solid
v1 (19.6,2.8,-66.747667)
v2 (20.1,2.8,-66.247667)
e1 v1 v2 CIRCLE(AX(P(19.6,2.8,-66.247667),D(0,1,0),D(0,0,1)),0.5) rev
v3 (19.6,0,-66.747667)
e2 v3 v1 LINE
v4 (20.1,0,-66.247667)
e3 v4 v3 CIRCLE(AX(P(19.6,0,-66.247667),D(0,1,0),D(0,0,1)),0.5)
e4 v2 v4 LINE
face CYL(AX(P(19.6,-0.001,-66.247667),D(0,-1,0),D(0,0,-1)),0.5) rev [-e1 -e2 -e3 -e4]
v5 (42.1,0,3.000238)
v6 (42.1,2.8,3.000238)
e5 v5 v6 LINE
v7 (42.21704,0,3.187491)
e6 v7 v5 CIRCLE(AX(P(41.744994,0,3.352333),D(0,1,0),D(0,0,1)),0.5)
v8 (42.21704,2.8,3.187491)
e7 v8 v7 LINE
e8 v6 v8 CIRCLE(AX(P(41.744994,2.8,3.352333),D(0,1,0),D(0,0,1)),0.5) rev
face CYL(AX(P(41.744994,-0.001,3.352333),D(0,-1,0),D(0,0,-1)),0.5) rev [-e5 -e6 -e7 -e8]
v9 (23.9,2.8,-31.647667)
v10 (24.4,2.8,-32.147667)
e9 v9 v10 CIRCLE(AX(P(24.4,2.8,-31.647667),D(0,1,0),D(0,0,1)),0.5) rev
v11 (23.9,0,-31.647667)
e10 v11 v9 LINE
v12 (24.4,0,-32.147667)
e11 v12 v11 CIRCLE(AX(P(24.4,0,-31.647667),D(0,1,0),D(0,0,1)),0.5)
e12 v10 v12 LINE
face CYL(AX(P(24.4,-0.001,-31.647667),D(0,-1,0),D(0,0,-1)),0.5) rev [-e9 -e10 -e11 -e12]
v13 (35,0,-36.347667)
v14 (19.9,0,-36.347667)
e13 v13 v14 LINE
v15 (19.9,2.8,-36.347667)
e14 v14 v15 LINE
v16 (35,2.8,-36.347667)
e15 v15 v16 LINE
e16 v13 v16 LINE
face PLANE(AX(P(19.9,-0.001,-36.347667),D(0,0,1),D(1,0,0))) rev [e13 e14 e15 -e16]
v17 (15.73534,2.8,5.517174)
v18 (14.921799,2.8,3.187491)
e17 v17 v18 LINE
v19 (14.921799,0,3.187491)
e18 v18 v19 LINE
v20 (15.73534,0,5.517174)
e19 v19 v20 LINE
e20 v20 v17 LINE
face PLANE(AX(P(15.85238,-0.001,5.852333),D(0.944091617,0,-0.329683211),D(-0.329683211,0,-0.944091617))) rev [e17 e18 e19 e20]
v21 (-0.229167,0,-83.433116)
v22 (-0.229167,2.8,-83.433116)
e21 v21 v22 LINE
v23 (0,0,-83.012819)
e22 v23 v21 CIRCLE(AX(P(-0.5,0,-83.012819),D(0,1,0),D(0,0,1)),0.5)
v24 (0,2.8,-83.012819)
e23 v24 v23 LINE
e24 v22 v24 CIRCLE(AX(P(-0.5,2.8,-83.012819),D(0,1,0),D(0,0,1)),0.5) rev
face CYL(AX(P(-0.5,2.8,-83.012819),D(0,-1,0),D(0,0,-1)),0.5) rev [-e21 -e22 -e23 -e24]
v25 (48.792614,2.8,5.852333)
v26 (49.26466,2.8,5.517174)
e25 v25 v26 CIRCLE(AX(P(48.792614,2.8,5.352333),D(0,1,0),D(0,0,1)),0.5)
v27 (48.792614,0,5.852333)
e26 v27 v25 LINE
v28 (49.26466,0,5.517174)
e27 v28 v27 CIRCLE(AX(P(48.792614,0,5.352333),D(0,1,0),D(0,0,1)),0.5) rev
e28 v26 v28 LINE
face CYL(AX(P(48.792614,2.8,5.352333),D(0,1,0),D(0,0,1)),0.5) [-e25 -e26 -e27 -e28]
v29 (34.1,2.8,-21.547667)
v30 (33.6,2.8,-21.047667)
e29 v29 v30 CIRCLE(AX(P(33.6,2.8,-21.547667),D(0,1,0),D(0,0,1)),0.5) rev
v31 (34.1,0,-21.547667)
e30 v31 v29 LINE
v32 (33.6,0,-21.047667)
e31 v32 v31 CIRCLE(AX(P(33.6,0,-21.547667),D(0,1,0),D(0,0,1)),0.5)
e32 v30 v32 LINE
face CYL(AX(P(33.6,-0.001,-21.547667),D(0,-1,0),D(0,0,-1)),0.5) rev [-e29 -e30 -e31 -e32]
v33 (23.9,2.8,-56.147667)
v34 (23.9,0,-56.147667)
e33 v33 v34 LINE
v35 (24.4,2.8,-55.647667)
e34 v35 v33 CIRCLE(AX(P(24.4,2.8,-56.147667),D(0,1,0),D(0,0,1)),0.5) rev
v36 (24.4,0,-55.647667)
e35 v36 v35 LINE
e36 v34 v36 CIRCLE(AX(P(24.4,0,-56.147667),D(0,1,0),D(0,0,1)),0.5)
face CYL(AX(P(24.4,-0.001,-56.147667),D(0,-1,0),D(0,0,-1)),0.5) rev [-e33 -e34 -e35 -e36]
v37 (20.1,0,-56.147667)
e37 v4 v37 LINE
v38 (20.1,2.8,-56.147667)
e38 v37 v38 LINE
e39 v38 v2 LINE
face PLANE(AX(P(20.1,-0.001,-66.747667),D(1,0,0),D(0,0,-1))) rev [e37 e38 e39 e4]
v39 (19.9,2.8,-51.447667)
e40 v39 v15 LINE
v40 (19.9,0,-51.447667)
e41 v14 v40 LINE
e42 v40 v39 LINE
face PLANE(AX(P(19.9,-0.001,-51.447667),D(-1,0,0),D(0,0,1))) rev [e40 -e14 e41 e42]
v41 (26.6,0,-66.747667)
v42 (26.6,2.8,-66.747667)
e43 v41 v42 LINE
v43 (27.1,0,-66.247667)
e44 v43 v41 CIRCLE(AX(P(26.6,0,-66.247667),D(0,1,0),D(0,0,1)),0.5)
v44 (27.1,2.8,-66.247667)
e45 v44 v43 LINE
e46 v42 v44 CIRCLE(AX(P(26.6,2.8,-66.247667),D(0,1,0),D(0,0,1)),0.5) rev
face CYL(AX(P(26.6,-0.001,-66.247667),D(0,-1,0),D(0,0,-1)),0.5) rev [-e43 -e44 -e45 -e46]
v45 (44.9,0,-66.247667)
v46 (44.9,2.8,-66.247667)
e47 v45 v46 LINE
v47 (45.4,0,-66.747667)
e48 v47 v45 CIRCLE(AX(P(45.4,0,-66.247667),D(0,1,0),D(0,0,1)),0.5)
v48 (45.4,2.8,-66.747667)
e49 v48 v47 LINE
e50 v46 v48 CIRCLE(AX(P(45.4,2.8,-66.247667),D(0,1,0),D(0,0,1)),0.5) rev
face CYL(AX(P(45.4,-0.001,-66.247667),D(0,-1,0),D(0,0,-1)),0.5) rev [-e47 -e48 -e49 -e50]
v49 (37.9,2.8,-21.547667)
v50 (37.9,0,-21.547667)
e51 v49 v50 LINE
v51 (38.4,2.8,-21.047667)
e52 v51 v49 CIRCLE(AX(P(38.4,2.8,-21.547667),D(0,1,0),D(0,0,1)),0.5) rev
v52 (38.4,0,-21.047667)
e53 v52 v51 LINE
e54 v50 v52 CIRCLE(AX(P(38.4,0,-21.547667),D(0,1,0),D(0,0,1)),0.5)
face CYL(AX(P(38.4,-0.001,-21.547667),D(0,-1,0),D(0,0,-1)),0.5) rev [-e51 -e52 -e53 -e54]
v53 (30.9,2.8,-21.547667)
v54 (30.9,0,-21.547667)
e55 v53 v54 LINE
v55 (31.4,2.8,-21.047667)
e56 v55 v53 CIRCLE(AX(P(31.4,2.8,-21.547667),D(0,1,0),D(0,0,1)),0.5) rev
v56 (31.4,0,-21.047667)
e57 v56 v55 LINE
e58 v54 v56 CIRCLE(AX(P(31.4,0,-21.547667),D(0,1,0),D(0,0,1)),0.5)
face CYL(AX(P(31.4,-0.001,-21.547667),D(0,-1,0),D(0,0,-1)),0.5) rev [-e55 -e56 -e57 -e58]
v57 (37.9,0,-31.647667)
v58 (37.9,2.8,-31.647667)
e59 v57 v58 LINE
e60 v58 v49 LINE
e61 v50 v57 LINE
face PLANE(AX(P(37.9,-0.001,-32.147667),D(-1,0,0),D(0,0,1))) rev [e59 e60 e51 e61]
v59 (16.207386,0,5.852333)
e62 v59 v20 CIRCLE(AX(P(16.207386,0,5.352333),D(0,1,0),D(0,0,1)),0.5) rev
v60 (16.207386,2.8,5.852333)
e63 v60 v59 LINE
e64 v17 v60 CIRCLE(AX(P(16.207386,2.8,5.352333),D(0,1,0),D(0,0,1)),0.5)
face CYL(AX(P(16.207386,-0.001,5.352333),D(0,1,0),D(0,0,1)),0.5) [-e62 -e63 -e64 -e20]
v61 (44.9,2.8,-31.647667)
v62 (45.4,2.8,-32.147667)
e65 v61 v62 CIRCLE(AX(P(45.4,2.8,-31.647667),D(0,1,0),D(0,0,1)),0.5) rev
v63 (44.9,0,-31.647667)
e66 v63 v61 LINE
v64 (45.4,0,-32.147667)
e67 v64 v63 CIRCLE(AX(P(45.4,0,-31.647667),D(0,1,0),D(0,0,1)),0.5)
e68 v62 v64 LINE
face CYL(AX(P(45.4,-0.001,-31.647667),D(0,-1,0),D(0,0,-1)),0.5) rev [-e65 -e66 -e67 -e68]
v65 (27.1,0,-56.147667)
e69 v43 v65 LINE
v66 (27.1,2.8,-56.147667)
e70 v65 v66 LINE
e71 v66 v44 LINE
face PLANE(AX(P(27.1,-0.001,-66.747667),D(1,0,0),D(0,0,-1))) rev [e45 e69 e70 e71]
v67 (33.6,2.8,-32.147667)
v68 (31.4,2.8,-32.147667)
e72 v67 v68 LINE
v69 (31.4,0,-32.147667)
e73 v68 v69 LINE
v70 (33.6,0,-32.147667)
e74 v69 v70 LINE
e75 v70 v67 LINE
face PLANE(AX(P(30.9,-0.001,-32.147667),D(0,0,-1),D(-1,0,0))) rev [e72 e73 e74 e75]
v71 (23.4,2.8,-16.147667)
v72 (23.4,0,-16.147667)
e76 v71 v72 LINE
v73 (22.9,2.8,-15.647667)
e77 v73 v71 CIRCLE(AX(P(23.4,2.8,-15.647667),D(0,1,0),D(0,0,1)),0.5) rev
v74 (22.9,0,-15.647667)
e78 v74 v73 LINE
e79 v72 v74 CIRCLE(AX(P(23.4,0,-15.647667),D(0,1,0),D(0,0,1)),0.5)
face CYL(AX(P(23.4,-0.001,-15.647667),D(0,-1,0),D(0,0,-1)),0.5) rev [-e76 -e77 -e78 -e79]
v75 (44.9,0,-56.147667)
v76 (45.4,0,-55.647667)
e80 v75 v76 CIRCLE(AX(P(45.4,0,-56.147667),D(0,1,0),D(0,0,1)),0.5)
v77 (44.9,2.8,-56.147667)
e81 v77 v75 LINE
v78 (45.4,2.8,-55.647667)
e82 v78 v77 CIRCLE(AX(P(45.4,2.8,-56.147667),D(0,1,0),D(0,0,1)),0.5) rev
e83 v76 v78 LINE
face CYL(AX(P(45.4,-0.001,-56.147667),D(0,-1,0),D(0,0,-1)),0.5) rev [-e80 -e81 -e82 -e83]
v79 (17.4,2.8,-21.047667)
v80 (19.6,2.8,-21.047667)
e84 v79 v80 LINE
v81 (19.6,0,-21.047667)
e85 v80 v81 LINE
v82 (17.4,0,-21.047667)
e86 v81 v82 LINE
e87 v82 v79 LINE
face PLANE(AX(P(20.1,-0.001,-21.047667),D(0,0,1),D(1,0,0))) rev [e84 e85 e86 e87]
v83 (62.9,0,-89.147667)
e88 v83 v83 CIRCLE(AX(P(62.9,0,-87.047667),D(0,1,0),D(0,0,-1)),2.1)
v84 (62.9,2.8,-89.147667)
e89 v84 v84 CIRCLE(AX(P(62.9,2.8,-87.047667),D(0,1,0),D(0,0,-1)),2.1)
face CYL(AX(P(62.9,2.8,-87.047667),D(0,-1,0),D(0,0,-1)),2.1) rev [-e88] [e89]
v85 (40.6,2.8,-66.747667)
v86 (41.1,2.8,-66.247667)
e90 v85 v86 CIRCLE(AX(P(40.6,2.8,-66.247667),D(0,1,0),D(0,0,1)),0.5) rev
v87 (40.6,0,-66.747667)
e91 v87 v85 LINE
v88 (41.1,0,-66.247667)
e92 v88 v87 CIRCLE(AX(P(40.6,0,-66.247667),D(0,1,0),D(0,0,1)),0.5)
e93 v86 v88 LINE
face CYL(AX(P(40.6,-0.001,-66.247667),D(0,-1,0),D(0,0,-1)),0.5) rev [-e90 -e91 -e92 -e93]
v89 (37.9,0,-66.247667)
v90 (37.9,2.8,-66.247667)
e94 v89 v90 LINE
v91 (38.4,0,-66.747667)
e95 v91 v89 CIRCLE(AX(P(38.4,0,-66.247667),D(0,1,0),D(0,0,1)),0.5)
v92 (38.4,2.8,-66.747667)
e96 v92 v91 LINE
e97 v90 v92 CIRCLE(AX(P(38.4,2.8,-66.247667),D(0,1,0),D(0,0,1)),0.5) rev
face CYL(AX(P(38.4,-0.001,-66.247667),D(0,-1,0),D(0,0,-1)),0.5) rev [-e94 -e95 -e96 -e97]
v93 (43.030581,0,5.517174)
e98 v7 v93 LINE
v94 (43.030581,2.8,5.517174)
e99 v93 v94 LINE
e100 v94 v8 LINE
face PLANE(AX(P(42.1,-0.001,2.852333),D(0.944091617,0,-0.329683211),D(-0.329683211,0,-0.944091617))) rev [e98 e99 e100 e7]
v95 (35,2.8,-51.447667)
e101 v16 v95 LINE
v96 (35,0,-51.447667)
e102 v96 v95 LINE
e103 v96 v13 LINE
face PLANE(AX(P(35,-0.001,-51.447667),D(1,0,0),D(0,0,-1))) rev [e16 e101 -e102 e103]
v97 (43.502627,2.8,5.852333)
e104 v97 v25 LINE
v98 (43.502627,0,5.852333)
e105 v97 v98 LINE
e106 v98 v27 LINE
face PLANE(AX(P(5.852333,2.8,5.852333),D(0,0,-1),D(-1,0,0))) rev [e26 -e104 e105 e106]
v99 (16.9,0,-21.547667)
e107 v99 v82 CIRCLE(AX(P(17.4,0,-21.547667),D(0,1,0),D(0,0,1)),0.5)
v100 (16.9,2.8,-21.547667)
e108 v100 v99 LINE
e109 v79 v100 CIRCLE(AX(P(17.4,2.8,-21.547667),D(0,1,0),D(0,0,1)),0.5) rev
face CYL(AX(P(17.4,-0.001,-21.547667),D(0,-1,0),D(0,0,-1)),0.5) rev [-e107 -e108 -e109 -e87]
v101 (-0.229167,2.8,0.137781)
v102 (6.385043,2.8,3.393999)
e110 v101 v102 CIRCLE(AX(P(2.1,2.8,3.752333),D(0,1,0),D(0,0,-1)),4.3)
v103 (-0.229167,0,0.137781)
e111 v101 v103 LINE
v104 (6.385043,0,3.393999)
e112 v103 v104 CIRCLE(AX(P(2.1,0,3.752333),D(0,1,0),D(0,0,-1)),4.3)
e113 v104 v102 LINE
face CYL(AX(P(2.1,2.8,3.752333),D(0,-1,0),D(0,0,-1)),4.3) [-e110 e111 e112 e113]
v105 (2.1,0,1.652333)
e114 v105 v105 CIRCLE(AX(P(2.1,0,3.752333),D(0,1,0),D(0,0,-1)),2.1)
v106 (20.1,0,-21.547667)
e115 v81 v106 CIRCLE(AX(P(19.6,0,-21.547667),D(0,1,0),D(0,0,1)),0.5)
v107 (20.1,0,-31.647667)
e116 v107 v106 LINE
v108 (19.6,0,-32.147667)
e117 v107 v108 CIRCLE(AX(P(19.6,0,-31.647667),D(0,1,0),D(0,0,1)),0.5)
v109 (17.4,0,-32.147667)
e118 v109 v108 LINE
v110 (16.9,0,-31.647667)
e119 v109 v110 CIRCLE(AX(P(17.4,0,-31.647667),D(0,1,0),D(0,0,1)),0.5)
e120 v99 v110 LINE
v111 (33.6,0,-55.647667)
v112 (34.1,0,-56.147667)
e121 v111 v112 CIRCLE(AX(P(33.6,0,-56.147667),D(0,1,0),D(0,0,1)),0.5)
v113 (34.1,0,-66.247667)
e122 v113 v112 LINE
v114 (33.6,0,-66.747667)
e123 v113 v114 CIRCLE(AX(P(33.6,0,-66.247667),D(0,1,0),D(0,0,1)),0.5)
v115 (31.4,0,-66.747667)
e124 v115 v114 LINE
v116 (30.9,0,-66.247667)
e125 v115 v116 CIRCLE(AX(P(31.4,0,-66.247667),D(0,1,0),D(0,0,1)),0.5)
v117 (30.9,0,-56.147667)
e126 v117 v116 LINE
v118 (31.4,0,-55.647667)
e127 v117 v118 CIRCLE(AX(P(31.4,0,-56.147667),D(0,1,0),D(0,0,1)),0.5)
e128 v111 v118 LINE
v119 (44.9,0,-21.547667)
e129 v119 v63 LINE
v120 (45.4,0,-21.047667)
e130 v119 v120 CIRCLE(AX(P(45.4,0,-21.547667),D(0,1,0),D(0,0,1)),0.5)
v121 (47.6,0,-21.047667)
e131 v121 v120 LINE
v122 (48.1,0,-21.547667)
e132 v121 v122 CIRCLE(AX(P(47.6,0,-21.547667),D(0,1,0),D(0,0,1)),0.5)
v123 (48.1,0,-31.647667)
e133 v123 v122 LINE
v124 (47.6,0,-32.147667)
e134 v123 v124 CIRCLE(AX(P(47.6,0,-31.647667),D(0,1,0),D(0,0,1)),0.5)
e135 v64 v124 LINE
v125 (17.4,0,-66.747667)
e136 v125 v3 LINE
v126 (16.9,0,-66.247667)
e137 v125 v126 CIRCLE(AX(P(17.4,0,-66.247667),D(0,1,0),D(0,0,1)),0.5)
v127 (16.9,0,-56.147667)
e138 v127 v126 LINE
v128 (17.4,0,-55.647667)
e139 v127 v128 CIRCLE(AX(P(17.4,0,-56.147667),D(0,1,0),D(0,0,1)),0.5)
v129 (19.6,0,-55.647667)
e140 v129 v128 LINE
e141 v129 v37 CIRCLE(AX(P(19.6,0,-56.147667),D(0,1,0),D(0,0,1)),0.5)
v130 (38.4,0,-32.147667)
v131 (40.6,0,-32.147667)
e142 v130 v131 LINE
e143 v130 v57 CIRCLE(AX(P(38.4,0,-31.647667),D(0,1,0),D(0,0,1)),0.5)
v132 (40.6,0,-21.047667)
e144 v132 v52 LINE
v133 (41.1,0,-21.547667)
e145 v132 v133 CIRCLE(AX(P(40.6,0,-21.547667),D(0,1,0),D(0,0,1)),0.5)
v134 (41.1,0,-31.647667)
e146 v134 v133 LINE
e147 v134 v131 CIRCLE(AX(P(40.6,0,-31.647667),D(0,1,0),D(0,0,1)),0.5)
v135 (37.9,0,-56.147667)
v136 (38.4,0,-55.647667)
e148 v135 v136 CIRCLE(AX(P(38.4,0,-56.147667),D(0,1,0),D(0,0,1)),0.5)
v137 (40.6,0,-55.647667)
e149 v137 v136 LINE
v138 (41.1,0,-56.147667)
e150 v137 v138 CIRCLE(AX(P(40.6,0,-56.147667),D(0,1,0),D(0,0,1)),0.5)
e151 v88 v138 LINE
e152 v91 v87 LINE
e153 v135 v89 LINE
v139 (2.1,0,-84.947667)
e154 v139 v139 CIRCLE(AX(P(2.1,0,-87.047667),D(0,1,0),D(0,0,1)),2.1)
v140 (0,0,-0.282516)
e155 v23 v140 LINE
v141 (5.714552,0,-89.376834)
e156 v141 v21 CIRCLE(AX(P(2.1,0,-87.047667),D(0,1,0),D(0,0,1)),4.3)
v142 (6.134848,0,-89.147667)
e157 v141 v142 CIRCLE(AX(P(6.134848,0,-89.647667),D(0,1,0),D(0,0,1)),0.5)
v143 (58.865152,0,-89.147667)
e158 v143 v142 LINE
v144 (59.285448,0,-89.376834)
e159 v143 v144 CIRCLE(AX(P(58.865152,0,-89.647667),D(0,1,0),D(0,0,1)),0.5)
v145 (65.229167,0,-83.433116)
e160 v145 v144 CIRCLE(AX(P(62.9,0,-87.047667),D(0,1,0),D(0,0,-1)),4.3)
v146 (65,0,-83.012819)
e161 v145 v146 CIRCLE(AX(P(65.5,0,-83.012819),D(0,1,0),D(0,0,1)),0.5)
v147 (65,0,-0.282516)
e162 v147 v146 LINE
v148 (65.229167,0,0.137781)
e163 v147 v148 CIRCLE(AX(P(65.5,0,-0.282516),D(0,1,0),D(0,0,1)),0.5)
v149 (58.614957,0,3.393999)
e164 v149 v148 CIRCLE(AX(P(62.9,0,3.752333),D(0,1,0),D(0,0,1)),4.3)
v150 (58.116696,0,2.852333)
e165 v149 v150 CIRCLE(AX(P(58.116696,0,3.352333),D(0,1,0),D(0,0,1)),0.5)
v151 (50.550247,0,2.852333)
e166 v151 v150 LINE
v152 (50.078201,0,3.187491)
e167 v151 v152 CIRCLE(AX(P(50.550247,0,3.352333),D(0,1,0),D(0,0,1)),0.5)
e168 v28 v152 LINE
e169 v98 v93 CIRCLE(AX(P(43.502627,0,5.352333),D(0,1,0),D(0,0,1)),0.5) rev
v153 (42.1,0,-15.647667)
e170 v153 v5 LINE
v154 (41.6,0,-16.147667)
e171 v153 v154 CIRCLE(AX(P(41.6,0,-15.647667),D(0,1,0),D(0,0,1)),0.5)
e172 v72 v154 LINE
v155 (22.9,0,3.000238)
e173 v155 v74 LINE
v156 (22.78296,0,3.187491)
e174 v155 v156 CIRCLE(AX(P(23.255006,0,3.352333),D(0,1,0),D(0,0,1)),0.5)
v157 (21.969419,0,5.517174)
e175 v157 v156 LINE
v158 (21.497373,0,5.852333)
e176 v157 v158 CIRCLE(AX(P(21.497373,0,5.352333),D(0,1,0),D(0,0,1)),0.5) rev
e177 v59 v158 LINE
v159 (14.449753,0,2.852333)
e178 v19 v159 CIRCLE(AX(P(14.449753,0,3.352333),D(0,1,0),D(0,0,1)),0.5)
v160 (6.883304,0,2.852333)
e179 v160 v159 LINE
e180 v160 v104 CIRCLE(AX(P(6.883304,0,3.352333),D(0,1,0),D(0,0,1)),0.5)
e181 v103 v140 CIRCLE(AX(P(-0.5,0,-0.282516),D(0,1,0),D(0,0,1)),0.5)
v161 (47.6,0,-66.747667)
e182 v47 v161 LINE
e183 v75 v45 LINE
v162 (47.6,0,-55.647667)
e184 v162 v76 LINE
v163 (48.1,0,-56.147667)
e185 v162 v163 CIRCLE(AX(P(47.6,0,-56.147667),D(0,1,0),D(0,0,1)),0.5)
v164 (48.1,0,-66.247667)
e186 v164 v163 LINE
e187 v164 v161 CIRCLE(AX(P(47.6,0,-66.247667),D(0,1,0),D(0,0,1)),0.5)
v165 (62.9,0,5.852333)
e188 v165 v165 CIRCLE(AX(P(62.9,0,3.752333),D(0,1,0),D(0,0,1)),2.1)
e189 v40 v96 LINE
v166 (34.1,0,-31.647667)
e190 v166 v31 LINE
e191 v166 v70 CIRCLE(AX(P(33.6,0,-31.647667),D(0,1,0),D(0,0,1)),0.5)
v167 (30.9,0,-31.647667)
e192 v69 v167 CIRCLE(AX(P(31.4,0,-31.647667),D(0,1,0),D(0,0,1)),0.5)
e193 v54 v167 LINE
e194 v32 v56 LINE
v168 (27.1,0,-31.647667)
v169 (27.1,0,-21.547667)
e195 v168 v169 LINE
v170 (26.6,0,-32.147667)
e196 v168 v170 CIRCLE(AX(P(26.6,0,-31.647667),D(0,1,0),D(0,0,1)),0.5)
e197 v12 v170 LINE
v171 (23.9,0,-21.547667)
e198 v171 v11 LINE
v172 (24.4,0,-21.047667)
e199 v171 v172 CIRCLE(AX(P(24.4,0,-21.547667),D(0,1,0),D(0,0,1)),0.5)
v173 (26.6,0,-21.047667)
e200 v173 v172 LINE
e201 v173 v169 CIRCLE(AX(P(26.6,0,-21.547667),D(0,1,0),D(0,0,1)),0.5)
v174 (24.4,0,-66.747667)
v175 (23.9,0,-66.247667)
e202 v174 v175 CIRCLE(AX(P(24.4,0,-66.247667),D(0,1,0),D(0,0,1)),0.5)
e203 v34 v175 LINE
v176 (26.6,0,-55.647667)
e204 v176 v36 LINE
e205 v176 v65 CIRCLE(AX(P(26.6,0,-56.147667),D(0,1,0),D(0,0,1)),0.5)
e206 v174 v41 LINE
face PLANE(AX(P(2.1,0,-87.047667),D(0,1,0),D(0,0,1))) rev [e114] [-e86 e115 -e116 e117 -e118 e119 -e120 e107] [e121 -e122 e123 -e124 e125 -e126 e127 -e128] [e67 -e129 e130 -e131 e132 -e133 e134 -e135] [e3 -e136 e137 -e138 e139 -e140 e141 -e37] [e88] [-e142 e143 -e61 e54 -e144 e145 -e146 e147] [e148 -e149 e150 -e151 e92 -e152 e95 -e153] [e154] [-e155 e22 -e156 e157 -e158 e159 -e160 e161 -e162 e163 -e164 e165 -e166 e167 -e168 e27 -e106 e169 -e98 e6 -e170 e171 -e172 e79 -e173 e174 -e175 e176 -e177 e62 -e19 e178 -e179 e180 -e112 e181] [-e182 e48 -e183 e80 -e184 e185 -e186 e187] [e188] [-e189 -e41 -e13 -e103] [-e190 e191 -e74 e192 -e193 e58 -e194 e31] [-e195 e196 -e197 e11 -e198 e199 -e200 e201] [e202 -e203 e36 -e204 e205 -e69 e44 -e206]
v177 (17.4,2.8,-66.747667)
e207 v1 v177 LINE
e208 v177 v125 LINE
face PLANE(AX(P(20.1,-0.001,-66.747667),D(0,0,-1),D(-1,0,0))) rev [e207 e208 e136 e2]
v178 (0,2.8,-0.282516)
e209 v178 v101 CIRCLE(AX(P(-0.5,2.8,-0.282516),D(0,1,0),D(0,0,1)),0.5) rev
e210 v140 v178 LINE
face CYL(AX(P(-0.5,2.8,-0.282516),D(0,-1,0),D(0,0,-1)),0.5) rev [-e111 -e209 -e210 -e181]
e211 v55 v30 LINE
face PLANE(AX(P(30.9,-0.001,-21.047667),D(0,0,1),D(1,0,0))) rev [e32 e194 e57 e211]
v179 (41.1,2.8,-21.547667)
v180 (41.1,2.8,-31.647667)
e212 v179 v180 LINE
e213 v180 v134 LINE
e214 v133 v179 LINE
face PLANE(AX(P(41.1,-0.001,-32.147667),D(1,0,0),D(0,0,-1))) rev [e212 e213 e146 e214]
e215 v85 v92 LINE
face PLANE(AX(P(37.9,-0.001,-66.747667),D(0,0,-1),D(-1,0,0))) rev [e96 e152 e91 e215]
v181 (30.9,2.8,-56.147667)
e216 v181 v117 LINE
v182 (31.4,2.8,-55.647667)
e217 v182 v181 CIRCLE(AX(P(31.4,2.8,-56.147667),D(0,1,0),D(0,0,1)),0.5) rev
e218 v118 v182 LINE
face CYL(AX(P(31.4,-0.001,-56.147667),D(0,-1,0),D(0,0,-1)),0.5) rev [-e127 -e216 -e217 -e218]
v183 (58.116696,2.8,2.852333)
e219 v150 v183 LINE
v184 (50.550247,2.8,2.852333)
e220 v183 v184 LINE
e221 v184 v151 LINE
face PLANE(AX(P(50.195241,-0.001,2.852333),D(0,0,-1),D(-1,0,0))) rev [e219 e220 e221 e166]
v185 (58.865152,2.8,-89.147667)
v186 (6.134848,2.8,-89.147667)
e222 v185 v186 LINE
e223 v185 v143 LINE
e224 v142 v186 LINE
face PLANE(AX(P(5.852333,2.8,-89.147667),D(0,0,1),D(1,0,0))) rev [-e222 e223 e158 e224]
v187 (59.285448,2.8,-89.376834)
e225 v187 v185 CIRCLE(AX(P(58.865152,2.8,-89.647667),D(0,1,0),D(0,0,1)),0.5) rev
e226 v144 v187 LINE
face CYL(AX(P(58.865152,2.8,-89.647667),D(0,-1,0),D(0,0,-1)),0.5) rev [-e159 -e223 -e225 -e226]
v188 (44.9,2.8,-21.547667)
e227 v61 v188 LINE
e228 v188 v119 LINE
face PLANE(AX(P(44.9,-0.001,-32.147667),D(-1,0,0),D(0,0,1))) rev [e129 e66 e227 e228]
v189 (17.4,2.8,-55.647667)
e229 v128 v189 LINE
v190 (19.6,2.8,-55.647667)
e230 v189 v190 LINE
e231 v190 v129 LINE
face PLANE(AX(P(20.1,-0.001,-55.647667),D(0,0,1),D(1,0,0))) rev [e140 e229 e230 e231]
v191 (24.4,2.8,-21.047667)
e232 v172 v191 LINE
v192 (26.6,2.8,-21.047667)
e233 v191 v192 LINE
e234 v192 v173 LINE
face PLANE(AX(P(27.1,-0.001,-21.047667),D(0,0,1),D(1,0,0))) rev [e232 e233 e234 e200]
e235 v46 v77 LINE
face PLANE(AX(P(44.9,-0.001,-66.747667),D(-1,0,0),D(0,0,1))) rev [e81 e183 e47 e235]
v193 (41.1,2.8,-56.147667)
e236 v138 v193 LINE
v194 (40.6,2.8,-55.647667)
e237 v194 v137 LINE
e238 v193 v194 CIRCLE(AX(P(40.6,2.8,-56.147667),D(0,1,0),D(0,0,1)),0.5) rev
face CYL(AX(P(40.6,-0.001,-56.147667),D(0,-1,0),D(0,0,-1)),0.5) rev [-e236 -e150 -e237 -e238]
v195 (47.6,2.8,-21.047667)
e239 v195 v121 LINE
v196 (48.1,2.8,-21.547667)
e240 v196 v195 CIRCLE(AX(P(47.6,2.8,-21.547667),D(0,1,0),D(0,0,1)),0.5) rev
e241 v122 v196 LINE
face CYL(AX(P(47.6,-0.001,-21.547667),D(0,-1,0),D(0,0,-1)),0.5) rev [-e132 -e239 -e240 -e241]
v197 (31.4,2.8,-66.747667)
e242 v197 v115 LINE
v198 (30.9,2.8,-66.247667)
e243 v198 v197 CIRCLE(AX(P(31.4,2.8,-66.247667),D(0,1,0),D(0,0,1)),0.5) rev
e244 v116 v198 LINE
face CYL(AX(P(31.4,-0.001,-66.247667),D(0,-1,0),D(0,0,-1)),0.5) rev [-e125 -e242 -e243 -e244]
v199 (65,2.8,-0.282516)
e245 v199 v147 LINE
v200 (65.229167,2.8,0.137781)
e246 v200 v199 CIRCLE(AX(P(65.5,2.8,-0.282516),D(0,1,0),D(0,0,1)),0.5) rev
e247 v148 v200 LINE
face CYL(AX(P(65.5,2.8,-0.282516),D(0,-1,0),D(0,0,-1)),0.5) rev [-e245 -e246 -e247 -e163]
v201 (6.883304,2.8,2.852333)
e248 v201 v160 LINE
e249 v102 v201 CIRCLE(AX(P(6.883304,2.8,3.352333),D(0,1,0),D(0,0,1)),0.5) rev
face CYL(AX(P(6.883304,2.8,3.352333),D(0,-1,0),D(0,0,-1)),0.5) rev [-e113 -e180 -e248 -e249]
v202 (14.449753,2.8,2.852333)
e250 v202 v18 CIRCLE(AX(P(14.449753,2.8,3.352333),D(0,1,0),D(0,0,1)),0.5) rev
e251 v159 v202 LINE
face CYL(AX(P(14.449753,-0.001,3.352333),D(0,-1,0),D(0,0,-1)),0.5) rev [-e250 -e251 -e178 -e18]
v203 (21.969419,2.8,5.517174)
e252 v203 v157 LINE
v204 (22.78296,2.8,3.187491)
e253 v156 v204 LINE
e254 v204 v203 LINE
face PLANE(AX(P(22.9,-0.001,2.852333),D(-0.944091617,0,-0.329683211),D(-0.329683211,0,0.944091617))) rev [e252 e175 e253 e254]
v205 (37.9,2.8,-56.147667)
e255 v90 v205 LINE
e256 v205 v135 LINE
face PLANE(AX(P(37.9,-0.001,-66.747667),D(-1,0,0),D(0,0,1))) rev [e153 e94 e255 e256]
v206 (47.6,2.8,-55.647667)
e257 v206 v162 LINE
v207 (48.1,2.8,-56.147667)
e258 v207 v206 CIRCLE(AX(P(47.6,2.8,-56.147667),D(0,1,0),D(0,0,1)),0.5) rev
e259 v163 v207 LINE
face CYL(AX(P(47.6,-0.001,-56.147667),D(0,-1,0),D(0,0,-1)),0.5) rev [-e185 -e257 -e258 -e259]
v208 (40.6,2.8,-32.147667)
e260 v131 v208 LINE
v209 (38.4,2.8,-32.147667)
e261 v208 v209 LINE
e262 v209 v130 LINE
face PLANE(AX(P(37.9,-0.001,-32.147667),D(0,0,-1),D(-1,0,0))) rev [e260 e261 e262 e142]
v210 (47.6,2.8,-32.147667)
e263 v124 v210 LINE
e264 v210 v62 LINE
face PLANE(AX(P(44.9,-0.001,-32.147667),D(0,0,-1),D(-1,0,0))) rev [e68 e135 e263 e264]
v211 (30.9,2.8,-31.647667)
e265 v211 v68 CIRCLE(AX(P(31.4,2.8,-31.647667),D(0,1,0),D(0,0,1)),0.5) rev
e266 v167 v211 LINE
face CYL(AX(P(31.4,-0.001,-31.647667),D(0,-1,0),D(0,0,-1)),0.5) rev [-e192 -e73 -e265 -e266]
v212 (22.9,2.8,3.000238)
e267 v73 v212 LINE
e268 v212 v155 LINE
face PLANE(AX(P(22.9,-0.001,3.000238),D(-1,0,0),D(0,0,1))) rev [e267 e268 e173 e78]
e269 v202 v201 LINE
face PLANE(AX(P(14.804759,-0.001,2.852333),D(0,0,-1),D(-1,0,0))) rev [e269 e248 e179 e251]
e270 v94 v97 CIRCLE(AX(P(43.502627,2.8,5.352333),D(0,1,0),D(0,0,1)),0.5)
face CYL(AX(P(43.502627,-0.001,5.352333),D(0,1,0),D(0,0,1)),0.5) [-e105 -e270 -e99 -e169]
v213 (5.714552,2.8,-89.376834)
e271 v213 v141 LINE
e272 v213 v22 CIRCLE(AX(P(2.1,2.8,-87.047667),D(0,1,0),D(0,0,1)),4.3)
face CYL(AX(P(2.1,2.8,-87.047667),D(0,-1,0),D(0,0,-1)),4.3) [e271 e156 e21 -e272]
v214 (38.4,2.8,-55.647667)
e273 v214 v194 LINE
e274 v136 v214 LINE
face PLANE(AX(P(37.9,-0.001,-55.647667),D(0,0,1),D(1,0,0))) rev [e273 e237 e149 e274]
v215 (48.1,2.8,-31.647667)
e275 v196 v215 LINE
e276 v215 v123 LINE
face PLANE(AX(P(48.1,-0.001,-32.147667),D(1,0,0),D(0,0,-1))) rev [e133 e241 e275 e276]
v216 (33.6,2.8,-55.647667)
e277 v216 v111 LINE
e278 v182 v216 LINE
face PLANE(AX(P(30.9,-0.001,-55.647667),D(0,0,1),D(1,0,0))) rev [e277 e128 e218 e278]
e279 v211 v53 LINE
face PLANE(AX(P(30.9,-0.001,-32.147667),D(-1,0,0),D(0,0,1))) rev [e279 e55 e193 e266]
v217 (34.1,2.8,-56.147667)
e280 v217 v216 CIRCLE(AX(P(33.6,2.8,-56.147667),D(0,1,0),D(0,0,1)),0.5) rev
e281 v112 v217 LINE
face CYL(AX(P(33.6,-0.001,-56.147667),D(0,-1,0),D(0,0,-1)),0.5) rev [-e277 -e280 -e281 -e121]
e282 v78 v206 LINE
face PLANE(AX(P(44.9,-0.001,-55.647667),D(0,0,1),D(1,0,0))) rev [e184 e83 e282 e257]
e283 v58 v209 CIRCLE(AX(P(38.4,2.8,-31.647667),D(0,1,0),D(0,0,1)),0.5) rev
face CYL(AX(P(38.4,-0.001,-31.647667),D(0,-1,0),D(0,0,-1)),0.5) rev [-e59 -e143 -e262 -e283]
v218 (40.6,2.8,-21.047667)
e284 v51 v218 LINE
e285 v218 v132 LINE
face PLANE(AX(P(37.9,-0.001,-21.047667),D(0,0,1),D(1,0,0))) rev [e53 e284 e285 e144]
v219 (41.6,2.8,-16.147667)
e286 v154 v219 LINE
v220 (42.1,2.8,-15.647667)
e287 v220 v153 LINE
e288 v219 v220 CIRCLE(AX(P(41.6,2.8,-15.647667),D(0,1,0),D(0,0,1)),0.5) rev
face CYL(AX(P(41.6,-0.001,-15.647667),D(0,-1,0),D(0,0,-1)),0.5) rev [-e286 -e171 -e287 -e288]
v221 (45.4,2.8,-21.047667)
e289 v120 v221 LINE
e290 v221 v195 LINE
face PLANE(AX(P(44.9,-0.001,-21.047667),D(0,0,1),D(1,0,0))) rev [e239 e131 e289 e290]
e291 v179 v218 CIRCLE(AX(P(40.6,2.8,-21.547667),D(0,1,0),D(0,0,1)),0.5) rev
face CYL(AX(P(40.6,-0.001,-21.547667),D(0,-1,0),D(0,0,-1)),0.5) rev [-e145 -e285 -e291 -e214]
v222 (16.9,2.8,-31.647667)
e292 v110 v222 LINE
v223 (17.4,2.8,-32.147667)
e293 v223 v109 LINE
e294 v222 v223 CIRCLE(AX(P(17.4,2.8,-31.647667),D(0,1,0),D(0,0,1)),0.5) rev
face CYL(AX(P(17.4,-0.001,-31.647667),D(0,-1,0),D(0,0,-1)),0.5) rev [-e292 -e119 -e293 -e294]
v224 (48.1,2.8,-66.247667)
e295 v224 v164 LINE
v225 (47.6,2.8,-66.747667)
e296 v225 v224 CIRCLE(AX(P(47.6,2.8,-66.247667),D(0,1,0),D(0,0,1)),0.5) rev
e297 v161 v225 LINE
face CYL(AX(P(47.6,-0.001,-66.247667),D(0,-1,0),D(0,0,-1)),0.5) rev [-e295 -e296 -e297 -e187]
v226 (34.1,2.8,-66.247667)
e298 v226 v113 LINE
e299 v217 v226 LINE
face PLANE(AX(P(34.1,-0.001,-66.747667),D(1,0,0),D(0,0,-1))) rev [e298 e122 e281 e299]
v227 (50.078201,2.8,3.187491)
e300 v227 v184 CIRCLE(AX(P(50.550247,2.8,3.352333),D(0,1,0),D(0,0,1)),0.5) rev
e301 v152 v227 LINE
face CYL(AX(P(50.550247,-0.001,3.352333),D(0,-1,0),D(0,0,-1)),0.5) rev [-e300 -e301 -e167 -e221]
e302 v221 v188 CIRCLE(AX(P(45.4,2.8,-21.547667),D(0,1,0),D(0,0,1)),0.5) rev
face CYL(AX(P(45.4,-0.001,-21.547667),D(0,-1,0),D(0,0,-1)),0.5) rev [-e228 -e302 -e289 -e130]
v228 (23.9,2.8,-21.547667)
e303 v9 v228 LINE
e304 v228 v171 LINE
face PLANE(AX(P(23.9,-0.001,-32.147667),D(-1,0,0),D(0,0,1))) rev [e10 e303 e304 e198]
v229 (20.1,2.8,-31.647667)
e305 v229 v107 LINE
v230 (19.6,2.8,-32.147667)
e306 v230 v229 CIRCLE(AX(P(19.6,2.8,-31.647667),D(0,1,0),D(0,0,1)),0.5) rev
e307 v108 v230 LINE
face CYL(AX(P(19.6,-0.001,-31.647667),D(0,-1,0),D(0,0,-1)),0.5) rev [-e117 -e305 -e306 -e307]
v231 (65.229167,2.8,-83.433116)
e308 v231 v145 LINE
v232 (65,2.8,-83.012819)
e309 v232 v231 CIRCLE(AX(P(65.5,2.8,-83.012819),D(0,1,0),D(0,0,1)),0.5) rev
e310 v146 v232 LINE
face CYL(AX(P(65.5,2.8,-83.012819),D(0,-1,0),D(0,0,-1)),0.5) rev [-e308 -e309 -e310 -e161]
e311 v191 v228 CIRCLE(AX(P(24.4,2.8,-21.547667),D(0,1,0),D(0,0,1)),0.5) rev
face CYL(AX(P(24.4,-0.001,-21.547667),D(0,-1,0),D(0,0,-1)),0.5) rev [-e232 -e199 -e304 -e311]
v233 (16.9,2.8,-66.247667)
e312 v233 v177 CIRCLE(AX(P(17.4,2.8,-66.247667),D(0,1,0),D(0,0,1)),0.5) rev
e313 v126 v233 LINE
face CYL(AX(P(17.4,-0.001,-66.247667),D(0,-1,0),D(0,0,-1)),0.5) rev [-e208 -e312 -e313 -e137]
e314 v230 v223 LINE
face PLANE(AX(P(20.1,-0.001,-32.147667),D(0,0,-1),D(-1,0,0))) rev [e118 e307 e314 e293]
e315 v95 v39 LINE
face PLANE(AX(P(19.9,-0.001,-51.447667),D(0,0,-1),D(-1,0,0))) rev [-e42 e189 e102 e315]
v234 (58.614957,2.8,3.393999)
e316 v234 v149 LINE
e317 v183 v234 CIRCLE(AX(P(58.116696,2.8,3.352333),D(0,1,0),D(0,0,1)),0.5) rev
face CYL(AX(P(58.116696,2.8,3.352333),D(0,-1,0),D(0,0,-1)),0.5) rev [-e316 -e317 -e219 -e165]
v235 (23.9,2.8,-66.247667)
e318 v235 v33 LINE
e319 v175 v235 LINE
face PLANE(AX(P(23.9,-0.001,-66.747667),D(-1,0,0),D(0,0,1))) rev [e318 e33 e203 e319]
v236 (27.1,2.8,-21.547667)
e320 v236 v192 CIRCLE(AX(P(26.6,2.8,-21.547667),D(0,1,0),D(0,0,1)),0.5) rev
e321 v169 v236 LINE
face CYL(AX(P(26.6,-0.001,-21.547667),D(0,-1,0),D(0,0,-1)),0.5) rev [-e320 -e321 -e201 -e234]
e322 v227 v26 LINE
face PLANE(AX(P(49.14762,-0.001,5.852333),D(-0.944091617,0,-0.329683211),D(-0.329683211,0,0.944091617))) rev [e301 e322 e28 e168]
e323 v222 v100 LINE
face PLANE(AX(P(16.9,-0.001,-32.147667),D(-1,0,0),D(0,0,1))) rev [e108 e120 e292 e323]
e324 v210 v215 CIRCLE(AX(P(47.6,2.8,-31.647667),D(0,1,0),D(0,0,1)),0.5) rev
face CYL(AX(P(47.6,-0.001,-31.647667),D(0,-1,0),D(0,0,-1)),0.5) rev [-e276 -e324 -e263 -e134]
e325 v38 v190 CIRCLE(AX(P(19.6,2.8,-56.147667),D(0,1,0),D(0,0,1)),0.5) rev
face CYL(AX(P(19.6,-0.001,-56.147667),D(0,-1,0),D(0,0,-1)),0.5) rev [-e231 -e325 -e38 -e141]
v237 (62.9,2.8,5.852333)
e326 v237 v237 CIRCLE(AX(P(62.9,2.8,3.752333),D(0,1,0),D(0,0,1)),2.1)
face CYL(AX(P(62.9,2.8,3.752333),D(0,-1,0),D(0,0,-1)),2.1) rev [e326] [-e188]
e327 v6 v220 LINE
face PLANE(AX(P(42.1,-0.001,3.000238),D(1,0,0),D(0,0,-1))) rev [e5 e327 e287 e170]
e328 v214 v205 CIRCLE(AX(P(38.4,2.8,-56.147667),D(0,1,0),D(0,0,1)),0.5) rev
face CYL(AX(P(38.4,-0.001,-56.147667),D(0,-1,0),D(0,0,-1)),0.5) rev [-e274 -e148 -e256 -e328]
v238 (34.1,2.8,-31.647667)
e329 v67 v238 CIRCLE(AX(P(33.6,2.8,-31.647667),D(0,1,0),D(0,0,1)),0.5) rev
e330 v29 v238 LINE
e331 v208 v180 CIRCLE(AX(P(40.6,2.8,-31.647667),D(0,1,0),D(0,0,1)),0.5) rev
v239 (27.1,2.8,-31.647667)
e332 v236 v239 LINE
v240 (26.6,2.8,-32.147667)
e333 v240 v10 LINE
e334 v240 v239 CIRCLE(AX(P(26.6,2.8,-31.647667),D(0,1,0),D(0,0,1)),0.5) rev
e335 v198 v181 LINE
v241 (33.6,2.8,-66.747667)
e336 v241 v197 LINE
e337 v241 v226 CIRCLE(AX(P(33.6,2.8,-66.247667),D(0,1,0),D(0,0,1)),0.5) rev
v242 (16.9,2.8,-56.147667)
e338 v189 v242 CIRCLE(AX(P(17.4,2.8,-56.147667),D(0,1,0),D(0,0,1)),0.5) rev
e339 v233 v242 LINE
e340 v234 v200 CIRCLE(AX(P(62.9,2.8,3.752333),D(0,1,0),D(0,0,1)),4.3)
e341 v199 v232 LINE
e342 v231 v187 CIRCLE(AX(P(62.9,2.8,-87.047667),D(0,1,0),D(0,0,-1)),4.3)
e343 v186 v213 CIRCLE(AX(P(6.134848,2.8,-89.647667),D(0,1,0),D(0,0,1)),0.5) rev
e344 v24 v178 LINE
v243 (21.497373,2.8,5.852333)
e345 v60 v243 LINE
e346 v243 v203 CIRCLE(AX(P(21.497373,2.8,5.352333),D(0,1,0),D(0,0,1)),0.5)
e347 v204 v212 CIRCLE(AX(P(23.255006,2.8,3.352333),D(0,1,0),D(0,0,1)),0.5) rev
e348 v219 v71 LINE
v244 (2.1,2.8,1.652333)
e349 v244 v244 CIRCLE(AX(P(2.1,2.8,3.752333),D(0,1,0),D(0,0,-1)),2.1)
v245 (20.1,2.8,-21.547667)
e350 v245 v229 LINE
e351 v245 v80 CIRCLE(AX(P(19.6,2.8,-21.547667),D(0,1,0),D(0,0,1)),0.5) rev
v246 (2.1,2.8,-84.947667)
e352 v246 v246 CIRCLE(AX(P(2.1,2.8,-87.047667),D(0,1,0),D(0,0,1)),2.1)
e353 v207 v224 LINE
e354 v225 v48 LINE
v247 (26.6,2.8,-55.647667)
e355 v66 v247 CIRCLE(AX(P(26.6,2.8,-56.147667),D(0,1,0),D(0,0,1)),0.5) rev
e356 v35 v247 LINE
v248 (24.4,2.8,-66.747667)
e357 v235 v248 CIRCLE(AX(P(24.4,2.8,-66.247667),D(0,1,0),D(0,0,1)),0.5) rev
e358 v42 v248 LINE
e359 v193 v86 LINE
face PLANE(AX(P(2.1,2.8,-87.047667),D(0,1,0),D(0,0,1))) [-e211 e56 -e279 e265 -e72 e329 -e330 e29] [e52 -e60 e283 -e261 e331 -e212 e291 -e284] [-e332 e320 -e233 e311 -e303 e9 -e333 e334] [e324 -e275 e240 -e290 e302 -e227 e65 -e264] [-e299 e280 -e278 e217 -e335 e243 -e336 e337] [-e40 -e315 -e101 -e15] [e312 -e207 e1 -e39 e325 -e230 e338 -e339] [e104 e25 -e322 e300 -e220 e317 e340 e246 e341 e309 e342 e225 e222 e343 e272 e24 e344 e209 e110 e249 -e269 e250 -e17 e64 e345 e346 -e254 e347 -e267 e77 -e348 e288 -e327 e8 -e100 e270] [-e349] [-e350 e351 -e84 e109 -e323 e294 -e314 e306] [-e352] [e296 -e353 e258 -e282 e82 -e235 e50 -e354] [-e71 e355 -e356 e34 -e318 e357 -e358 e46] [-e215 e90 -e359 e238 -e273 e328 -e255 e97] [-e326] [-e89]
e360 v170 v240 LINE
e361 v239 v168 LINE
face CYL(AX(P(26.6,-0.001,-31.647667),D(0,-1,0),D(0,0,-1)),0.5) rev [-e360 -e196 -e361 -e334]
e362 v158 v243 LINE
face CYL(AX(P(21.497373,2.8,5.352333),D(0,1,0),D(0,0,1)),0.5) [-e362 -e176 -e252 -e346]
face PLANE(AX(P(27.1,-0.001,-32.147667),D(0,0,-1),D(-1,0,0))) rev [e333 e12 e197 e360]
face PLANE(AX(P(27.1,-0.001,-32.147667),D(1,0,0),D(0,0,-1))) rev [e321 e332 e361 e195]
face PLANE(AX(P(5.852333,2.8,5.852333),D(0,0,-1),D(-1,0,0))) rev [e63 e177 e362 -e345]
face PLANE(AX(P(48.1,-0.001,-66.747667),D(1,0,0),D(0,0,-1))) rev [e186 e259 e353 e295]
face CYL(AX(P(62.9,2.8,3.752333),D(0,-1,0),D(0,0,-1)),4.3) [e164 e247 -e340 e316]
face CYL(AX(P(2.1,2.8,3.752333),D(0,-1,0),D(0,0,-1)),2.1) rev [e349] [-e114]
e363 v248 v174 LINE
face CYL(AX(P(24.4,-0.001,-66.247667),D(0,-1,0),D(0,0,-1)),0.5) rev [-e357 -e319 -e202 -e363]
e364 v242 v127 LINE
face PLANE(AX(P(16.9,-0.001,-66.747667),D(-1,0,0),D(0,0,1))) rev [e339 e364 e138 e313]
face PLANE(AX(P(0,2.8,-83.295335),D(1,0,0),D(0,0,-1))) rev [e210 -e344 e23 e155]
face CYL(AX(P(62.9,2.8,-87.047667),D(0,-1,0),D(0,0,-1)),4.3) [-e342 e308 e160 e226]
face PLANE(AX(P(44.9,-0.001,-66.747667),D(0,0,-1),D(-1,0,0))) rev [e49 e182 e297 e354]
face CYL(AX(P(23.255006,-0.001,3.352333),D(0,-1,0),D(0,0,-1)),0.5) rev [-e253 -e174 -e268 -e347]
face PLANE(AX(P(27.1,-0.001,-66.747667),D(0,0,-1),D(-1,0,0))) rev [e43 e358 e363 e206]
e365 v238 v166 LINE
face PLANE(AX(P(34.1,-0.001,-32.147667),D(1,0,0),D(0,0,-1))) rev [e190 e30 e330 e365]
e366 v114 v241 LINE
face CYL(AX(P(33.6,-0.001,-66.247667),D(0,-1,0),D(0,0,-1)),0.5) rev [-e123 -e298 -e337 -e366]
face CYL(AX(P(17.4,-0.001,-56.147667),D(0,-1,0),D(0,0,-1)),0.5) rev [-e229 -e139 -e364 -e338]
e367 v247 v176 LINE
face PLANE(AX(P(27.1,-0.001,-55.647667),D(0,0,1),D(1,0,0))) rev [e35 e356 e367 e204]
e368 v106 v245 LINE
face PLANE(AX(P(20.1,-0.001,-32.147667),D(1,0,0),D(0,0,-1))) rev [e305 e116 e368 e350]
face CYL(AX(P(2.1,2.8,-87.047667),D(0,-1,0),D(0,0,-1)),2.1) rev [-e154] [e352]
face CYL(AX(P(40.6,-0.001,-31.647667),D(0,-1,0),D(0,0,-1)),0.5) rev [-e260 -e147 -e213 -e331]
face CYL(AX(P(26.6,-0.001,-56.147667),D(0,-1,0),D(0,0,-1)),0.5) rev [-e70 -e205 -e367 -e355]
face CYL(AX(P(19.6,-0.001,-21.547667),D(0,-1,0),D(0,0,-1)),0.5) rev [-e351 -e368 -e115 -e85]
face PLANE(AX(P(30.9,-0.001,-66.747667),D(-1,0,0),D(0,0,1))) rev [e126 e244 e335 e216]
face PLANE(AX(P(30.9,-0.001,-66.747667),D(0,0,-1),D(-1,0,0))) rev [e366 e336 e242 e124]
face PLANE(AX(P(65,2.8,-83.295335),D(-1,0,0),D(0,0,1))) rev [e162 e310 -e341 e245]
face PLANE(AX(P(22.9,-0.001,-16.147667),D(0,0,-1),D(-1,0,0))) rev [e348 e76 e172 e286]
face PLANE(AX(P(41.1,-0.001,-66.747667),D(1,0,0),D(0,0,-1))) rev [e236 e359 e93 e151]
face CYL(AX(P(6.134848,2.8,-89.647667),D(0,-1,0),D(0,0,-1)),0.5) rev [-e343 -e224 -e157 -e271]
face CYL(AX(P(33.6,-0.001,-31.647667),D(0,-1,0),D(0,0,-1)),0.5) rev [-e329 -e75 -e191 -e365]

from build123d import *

# Parameters (mm, degrees)
BASEPLATE_OUTLINE_R = 2.1
BASEPLATE_DEPTH     = 2.8
CUT_EXTRUDE1_REACH  = 115.438
SKETCH3_W           = 19.2
SKETCH3_H           = 19.147905432
SKETCH3_W_2         = 15.1
SKETCH3_H_2         = 15.1
SKETCH3_W_3         = 3.2
SKETCH3_H_3         = 11.1
FILLET1_R           = 0.5


# Read off the part's stored shape, not the designer's step: BasePlate
with BuildPart() as part:
    # BasePlate outline → BasePlate (new body)
    with BuildSketch(Plane(origin=(0, 0, 0), x_dir=(1, 0, 0), z_dir=(0, 1, 0))):
        with BuildLine():
            Line((43.502626614, -5.852332608), (48.792614178, -5.852332608))
            ThreePointArc((48.792614178, -5.852332608), (49.082078508, -5.760021707), (49.264659986, -5.517174213))
            Line((49.264659986, -5.517174213), (50.078201202, -3.187491002))
            ThreePointArc((50.078201202, -3.187491002), (50.26078268, -2.944643509), (50.55024701, -2.852332608))
            Line((50.55024701, -2.852332608), (58.116695703, -2.852332608))
            ThreePointArc((58.116695703, -2.852332608), (58.484685739, -3.013831008), (58.614956567, -3.393999275))
            ThreePointArc((58.614956567, -3.393999275), (64.799237397, -7.61016844), (65.229166667, -0.137781095))
            ThreePointArc((65.229166667, -0.137781095), (65.061014427, 0.043158816), (65, 0.282515593))
            Line((65, 0.282515593), (65, 83.012819192))
            ThreePointArc((65, 83.012819192), (65.061014427, 83.252175969), (65.229166667, 83.433115879))
            ThreePointArc((65.229166667, 83.433115879), (65.940559159, 90.088226551), (59.285448487, 89.376834059))
            ThreePointArc((59.285448487, 89.376834059), (59.104508577, 89.208681819), (58.8651518, 89.147667392))
            Line((58.8651518, 89.147667392), (6.1348482, 89.147667392))
            ThreePointArc((6.1348482, 89.147667392), (5.895491423, 89.208681819), (5.714551513, 89.376834059))
            ThreePointArc((5.714551513, 89.376834059), (-0.940559159, 90.088226551), (-0.229166667, 83.433115879))
            ThreePointArc((-0.229166667, 83.433115879), (-0.061014427, 83.252175969), (0, 83.012819192))
            Line((0, 83.012819192), (0, 0.282515593))
            ThreePointArc((0, 0.282515593), (-0.061014427, 0.043158816), (-0.229166667, -0.137781095))
            ThreePointArc((-0.229166667, -0.137781095), (0.200762603, -7.61016844), (6.385043433, -3.393999275))
            ThreePointArc((6.385043433, -3.393999275), (6.515314261, -3.013831008), (6.883304297, -2.852332608))
            Line((6.883304297, -2.852332608), (14.44975299, -2.852332608))
            ThreePointArc((14.44975299, -2.852332608), (14.73921732, -2.944643509), (14.921798798, -3.187491002))
            Line((14.921798798, -3.187491002), (15.735340014, -5.517174213))
            ThreePointArc((15.735340014, -5.517174213), (15.917921492, -5.760021707), (16.207385822, -5.852332608))
            Line((16.207385822, -5.852332608), (21.497373386, -5.852332608))
            ThreePointArc((21.497373386, -5.852332608), (21.786837716, -5.760021707), (21.969419194, -5.517174213))
            Line((21.969419194, -5.517174213), (22.78296041, -3.187491002))
            ThreePointArc((22.78296041, -3.187491002), (22.965541888, -2.944643509), (23.255006218, -2.852332608))
            Line((23.255006218, -2.852332608), (41.744993782, -2.852332608))
            ThreePointArc((41.744993782, -2.852332608), (42.034458112, -2.944643509), (42.21703959, -3.187491002))
            Line((42.21703959, -3.187491002), (43.030580806, -5.517174213))
            ThreePointArc((43.030580806, -5.517174213), (43.213162284, -5.760021707), (43.502626614, -5.852332608))
        make_face()
        with Locations((2.1, -3.752332608)):
            Circle(BASEPLATE_OUTLINE_R, mode=Mode.SUBTRACT)
        with Locations((62.9, -3.752332608)):
            Circle(BASEPLATE_OUTLINE_R, mode=Mode.SUBTRACT)
        with Locations((2.1, 87.047667392)):
            Circle(BASEPLATE_OUTLINE_R, mode=Mode.SUBTRACT)
        with Locations((62.9, 87.047667392)):
            Circle(BASEPLATE_OUTLINE_R, mode=Mode.SUBTRACT)
    extrude(amount=BASEPLATE_DEPTH)

    # Sketch3 → Cut-Extrude1 (cut, up to next)
    with BuildSketch(Plane(origin=(0, 2.8, 0), x_dir=(1, 0, 0), z_dir=(0, 1, 0)), mode=Mode.PRIVATE) as cut_extrude1_sk1:
        with Locations((32.5, 6.573714676)):
            Rectangle(SKETCH3_W, SKETCH3_H)
    cut_extrude1_tool1 = extrude(cut_extrude1_sk1.sketch, amount=-CUT_EXTRUDE1_REACH, mode=Mode.PRIVATE) & part.part
    # Sketch3 → Cut-Extrude1 (cut, up to next)
    with BuildSketch(Plane(origin=(0, 2.8, 0), x_dir=(1, 0, 0), z_dir=(0, 1, 0)), mode=Mode.PRIVATE) as cut_extrude1_sk2:
        with Locations((27.45, 43.897667392)):
            Rectangle(SKETCH3_W_2, SKETCH3_H_2)
    cut_extrude1_tool2 = extrude(cut_extrude1_sk2.sketch, amount=-CUT_EXTRUDE1_REACH, mode=Mode.PRIVATE) & part.part
    # Sketch3 → Cut-Extrude1 (cut, up to next)
    with BuildSketch(Plane(origin=(0, 2.8, 0), x_dir=(1, 0, 0), z_dir=(0, 1, 0)), mode=Mode.PRIVATE) as cut_extrude1_sk3:
        with Locations((32.5, 26.597667392)):
            Rectangle(SKETCH3_W_3, SKETCH3_H_3)
    cut_extrude1_tool3 = extrude(cut_extrude1_sk3.sketch, amount=-CUT_EXTRUDE1_REACH, mode=Mode.PRIVATE) & part.part
    # Sketch3 → Cut-Extrude1 (cut, up to next)
    with BuildSketch(Plane(origin=(0, 2.8, 0), x_dir=(1, 0, 0), z_dir=(0, 1, 0)), mode=Mode.PRIVATE) as cut_extrude1_sk4:
        with Locations((18.5, 26.597667392)):
            Rectangle(SKETCH3_W_3, SKETCH3_H_3)
    cut_extrude1_tool4 = extrude(cut_extrude1_sk4.sketch, amount=-CUT_EXTRUDE1_REACH, mode=Mode.PRIVATE) & part.part
    # Sketch3 → Cut-Extrude1 (cut, up to next)
    with BuildSketch(Plane(origin=(0, 2.8, 0), x_dir=(1, 0, 0), z_dir=(0, 1, 0)), mode=Mode.PRIVATE) as cut_extrude1_sk5:
        with Locations((39.5, 26.597667392)):
            Rectangle(SKETCH3_W_3, SKETCH3_H_3)
    cut_extrude1_tool5 = extrude(cut_extrude1_sk5.sketch, amount=-CUT_EXTRUDE1_REACH, mode=Mode.PRIVATE) & part.part
    # Sketch3 → Cut-Extrude1 (cut, up to next)
    with BuildSketch(Plane(origin=(0, 2.8, 0), x_dir=(1, 0, 0), z_dir=(0, 1, 0)), mode=Mode.PRIVATE) as cut_extrude1_sk6:
        with Locations((46.5, 26.597667392)):
            Rectangle(SKETCH3_W_3, SKETCH3_H_3)
    cut_extrude1_tool6 = extrude(cut_extrude1_sk6.sketch, amount=-CUT_EXTRUDE1_REACH, mode=Mode.PRIVATE) & part.part
    # Sketch3 → Cut-Extrude1 (cut, up to next)
    with BuildSketch(Plane(origin=(0, 2.8, 0), x_dir=(1, 0, 0), z_dir=(0, 1, 0)), mode=Mode.PRIVATE) as cut_extrude1_sk7:
        with Locations((25.5, 26.597667392)):
            Rectangle(SKETCH3_W_3, SKETCH3_H_3)
    cut_extrude1_tool7 = extrude(cut_extrude1_sk7.sketch, amount=-CUT_EXTRUDE1_REACH, mode=Mode.PRIVATE) & part.part
    # Sketch3 → Cut-Extrude1 (cut, up to next)
    with BuildSketch(Plane(origin=(0, 2.8, 0), x_dir=(1, 0, 0), z_dir=(0, 1, 0)), mode=Mode.PRIVATE) as cut_extrude1_sk8:
        with Locations((18.5, 61.197667392)):
            Rectangle(SKETCH3_W_3, SKETCH3_H_3)
    cut_extrude1_tool8 = extrude(cut_extrude1_sk8.sketch, amount=-CUT_EXTRUDE1_REACH, mode=Mode.PRIVATE) & part.part
    # Sketch3 → Cut-Extrude1 (cut, up to next)
    with BuildSketch(Plane(origin=(0, 2.8, 0), x_dir=(1, 0, 0), z_dir=(0, 1, 0)), mode=Mode.PRIVATE) as cut_extrude1_sk9:
        with Locations((32.5, 61.197667392)):
            Rectangle(SKETCH3_W_3, SKETCH3_H_3)
    cut_extrude1_tool9 = extrude(cut_extrude1_sk9.sketch, amount=-CUT_EXTRUDE1_REACH, mode=Mode.PRIVATE) & part.part
    # Sketch3 → Cut-Extrude1 (cut, up to next)
    with BuildSketch(Plane(origin=(0, 2.8, 0), x_dir=(1, 0, 0), z_dir=(0, 1, 0)), mode=Mode.PRIVATE) as cut_extrude1_sk10:
        with Locations((39.5, 61.197667392)):
            Rectangle(SKETCH3_W_3, SKETCH3_H_3)
    cut_extrude1_tool10 = extrude(cut_extrude1_sk10.sketch, amount=-CUT_EXTRUDE1_REACH, mode=Mode.PRIVATE) & part.part
    # Sketch3 → Cut-Extrude1 (cut, up to next)
    with BuildSketch(Plane(origin=(0, 2.8, 0), x_dir=(1, 0, 0), z_dir=(0, 1, 0)), mode=Mode.PRIVATE) as cut_extrude1_sk11:
        with Locations((46.5, 61.197667392)):
            Rectangle(SKETCH3_W_3, SKETCH3_H_3)
    cut_extrude1_tool11 = extrude(cut_extrude1_sk11.sketch, amount=-CUT_EXTRUDE1_REACH, mode=Mode.PRIVATE) & part.part
    # Sketch3 → Cut-Extrude1 (cut, up to next)
    with BuildSketch(Plane(origin=(0, 2.8, 0), x_dir=(1, 0, 0), z_dir=(0, 1, 0)), mode=Mode.PRIVATE) as cut_extrude1_sk12:
        with Locations((25.5, 61.197667392)):
            Rectangle(SKETCH3_W_3, SKETCH3_H_3)
    cut_extrude1_tool12 = extrude(cut_extrude1_sk12.sketch, amount=-CUT_EXTRUDE1_REACH, mode=Mode.PRIVATE) & part.part
    add(cut_extrude1_tool1.solids().sort_by_distance((32.5, 2.8, -6.573715))[0], mode=Mode.SUBTRACT)
    add(cut_extrude1_tool2.solids().sort_by_distance((27.45, 2.8, -43.897667))[0], mode=Mode.SUBTRACT)
    add(cut_extrude1_tool3.solids().sort_by_distance((32.5, 2.8, -26.597667))[0], mode=Mode.SUBTRACT)
    add(cut_extrude1_tool4.solids().sort_by_distance((18.5, 2.8, -26.597667))[0], mode=Mode.SUBTRACT)
    add(cut_extrude1_tool5.solids().sort_by_distance((39.5, 2.8, -26.597667))[0], mode=Mode.SUBTRACT)
    add(cut_extrude1_tool6.solids().sort_by_distance((46.5, 2.8, -26.597667))[0], mode=Mode.SUBTRACT)
    add(cut_extrude1_tool7.solids().sort_by_distance((25.5, 2.8, -26.597667))[0], mode=Mode.SUBTRACT)
    add(cut_extrude1_tool8.solids().sort_by_distance((18.5, 2.8, -61.197667))[0], mode=Mode.SUBTRACT)
    add(cut_extrude1_tool9.solids().sort_by_distance((32.5, 2.8, -61.197667))[0], mode=Mode.SUBTRACT)
    add(cut_extrude1_tool10.solids().sort_by_distance((39.5, 2.8, -61.197667))[0], mode=Mode.SUBTRACT)
    add(cut_extrude1_tool11.solids().sort_by_distance((46.5, 2.8, -61.197667))[0], mode=Mode.SUBTRACT)
    add(cut_extrude1_tool12.solids().sort_by_distance((25.5, 2.8, -61.197667))[0], mode=Mode.SUBTRACT)

    # Fillet1
    fillet1_edges = [part.edges().sort_by_distance(p)[0] for p in [
        (22.9, 1.4, -16.147667392),
        (42.1, 1.4, -16.147667392),
        (37.9, 1.4, -55.647667392),
        (37.9, 1.4, -66.747667392),
        (41.1, 1.4, -66.747667392),
        (41.1, 1.4, -55.647667392),
        (16.9, 1.4, -66.747667392),
        (20.1, 1.4, -66.747667392),
        (20.1, 1.4, -55.647667392),
        (16.9, 1.4, -55.647667392),
        (27.1, 1.4, -66.747667392),
        (27.1, 1.4, -55.647667392),
        (23.9, 1.4, -55.647667392),
        (23.9, 1.4, -66.747667392),
        (30.9, 1.4, -21.047667392),
        (30.9, 1.4, -32.147667392),
        (34.1, 1.4, -32.147667392),
        (34.1, 1.4, -21.047667392),
        (44.9, 1.4, -21.047667392),
        (44.9, 1.4, -32.147667392),
        (48.1, 1.4, -32.147667392),
        (48.1, 1.4, -21.047667392),
        (37.9, 1.4, -21.047667392),
        (37.9, 1.4, -32.147667392),
        (41.1, 1.4, -32.147667392),
        (41.1, 1.4, -21.047667392),
        (16.9, 1.4, -32.147667392),
        (20.1, 1.4, -32.147667392),
        (20.1, 1.4, -21.047667392),
        (16.9, 1.4, -21.047667392),
        (27.1, 1.4, -32.147667392),
        (27.1, 1.4, -21.047667392),
        (23.9, 1.4, -21.047667392),
        (23.9, 1.4, -32.147667392),
        (30.9, 1.4, -55.647667392),
        (30.9, 1.4, -66.747667392),
        (34.1, 1.4, -66.747667392),
        (34.1, 1.4, -55.647667392),
        (44.9, 1.4, -55.647667392),
        (44.9, 1.4, -66.747667392),
        (48.1, 1.4, -66.747667392),
        (48.1, 1.4, -55.647667392),
    ]]
    fillet(fillet1_edges, radius=FILLET1_R)


solid = part.part
